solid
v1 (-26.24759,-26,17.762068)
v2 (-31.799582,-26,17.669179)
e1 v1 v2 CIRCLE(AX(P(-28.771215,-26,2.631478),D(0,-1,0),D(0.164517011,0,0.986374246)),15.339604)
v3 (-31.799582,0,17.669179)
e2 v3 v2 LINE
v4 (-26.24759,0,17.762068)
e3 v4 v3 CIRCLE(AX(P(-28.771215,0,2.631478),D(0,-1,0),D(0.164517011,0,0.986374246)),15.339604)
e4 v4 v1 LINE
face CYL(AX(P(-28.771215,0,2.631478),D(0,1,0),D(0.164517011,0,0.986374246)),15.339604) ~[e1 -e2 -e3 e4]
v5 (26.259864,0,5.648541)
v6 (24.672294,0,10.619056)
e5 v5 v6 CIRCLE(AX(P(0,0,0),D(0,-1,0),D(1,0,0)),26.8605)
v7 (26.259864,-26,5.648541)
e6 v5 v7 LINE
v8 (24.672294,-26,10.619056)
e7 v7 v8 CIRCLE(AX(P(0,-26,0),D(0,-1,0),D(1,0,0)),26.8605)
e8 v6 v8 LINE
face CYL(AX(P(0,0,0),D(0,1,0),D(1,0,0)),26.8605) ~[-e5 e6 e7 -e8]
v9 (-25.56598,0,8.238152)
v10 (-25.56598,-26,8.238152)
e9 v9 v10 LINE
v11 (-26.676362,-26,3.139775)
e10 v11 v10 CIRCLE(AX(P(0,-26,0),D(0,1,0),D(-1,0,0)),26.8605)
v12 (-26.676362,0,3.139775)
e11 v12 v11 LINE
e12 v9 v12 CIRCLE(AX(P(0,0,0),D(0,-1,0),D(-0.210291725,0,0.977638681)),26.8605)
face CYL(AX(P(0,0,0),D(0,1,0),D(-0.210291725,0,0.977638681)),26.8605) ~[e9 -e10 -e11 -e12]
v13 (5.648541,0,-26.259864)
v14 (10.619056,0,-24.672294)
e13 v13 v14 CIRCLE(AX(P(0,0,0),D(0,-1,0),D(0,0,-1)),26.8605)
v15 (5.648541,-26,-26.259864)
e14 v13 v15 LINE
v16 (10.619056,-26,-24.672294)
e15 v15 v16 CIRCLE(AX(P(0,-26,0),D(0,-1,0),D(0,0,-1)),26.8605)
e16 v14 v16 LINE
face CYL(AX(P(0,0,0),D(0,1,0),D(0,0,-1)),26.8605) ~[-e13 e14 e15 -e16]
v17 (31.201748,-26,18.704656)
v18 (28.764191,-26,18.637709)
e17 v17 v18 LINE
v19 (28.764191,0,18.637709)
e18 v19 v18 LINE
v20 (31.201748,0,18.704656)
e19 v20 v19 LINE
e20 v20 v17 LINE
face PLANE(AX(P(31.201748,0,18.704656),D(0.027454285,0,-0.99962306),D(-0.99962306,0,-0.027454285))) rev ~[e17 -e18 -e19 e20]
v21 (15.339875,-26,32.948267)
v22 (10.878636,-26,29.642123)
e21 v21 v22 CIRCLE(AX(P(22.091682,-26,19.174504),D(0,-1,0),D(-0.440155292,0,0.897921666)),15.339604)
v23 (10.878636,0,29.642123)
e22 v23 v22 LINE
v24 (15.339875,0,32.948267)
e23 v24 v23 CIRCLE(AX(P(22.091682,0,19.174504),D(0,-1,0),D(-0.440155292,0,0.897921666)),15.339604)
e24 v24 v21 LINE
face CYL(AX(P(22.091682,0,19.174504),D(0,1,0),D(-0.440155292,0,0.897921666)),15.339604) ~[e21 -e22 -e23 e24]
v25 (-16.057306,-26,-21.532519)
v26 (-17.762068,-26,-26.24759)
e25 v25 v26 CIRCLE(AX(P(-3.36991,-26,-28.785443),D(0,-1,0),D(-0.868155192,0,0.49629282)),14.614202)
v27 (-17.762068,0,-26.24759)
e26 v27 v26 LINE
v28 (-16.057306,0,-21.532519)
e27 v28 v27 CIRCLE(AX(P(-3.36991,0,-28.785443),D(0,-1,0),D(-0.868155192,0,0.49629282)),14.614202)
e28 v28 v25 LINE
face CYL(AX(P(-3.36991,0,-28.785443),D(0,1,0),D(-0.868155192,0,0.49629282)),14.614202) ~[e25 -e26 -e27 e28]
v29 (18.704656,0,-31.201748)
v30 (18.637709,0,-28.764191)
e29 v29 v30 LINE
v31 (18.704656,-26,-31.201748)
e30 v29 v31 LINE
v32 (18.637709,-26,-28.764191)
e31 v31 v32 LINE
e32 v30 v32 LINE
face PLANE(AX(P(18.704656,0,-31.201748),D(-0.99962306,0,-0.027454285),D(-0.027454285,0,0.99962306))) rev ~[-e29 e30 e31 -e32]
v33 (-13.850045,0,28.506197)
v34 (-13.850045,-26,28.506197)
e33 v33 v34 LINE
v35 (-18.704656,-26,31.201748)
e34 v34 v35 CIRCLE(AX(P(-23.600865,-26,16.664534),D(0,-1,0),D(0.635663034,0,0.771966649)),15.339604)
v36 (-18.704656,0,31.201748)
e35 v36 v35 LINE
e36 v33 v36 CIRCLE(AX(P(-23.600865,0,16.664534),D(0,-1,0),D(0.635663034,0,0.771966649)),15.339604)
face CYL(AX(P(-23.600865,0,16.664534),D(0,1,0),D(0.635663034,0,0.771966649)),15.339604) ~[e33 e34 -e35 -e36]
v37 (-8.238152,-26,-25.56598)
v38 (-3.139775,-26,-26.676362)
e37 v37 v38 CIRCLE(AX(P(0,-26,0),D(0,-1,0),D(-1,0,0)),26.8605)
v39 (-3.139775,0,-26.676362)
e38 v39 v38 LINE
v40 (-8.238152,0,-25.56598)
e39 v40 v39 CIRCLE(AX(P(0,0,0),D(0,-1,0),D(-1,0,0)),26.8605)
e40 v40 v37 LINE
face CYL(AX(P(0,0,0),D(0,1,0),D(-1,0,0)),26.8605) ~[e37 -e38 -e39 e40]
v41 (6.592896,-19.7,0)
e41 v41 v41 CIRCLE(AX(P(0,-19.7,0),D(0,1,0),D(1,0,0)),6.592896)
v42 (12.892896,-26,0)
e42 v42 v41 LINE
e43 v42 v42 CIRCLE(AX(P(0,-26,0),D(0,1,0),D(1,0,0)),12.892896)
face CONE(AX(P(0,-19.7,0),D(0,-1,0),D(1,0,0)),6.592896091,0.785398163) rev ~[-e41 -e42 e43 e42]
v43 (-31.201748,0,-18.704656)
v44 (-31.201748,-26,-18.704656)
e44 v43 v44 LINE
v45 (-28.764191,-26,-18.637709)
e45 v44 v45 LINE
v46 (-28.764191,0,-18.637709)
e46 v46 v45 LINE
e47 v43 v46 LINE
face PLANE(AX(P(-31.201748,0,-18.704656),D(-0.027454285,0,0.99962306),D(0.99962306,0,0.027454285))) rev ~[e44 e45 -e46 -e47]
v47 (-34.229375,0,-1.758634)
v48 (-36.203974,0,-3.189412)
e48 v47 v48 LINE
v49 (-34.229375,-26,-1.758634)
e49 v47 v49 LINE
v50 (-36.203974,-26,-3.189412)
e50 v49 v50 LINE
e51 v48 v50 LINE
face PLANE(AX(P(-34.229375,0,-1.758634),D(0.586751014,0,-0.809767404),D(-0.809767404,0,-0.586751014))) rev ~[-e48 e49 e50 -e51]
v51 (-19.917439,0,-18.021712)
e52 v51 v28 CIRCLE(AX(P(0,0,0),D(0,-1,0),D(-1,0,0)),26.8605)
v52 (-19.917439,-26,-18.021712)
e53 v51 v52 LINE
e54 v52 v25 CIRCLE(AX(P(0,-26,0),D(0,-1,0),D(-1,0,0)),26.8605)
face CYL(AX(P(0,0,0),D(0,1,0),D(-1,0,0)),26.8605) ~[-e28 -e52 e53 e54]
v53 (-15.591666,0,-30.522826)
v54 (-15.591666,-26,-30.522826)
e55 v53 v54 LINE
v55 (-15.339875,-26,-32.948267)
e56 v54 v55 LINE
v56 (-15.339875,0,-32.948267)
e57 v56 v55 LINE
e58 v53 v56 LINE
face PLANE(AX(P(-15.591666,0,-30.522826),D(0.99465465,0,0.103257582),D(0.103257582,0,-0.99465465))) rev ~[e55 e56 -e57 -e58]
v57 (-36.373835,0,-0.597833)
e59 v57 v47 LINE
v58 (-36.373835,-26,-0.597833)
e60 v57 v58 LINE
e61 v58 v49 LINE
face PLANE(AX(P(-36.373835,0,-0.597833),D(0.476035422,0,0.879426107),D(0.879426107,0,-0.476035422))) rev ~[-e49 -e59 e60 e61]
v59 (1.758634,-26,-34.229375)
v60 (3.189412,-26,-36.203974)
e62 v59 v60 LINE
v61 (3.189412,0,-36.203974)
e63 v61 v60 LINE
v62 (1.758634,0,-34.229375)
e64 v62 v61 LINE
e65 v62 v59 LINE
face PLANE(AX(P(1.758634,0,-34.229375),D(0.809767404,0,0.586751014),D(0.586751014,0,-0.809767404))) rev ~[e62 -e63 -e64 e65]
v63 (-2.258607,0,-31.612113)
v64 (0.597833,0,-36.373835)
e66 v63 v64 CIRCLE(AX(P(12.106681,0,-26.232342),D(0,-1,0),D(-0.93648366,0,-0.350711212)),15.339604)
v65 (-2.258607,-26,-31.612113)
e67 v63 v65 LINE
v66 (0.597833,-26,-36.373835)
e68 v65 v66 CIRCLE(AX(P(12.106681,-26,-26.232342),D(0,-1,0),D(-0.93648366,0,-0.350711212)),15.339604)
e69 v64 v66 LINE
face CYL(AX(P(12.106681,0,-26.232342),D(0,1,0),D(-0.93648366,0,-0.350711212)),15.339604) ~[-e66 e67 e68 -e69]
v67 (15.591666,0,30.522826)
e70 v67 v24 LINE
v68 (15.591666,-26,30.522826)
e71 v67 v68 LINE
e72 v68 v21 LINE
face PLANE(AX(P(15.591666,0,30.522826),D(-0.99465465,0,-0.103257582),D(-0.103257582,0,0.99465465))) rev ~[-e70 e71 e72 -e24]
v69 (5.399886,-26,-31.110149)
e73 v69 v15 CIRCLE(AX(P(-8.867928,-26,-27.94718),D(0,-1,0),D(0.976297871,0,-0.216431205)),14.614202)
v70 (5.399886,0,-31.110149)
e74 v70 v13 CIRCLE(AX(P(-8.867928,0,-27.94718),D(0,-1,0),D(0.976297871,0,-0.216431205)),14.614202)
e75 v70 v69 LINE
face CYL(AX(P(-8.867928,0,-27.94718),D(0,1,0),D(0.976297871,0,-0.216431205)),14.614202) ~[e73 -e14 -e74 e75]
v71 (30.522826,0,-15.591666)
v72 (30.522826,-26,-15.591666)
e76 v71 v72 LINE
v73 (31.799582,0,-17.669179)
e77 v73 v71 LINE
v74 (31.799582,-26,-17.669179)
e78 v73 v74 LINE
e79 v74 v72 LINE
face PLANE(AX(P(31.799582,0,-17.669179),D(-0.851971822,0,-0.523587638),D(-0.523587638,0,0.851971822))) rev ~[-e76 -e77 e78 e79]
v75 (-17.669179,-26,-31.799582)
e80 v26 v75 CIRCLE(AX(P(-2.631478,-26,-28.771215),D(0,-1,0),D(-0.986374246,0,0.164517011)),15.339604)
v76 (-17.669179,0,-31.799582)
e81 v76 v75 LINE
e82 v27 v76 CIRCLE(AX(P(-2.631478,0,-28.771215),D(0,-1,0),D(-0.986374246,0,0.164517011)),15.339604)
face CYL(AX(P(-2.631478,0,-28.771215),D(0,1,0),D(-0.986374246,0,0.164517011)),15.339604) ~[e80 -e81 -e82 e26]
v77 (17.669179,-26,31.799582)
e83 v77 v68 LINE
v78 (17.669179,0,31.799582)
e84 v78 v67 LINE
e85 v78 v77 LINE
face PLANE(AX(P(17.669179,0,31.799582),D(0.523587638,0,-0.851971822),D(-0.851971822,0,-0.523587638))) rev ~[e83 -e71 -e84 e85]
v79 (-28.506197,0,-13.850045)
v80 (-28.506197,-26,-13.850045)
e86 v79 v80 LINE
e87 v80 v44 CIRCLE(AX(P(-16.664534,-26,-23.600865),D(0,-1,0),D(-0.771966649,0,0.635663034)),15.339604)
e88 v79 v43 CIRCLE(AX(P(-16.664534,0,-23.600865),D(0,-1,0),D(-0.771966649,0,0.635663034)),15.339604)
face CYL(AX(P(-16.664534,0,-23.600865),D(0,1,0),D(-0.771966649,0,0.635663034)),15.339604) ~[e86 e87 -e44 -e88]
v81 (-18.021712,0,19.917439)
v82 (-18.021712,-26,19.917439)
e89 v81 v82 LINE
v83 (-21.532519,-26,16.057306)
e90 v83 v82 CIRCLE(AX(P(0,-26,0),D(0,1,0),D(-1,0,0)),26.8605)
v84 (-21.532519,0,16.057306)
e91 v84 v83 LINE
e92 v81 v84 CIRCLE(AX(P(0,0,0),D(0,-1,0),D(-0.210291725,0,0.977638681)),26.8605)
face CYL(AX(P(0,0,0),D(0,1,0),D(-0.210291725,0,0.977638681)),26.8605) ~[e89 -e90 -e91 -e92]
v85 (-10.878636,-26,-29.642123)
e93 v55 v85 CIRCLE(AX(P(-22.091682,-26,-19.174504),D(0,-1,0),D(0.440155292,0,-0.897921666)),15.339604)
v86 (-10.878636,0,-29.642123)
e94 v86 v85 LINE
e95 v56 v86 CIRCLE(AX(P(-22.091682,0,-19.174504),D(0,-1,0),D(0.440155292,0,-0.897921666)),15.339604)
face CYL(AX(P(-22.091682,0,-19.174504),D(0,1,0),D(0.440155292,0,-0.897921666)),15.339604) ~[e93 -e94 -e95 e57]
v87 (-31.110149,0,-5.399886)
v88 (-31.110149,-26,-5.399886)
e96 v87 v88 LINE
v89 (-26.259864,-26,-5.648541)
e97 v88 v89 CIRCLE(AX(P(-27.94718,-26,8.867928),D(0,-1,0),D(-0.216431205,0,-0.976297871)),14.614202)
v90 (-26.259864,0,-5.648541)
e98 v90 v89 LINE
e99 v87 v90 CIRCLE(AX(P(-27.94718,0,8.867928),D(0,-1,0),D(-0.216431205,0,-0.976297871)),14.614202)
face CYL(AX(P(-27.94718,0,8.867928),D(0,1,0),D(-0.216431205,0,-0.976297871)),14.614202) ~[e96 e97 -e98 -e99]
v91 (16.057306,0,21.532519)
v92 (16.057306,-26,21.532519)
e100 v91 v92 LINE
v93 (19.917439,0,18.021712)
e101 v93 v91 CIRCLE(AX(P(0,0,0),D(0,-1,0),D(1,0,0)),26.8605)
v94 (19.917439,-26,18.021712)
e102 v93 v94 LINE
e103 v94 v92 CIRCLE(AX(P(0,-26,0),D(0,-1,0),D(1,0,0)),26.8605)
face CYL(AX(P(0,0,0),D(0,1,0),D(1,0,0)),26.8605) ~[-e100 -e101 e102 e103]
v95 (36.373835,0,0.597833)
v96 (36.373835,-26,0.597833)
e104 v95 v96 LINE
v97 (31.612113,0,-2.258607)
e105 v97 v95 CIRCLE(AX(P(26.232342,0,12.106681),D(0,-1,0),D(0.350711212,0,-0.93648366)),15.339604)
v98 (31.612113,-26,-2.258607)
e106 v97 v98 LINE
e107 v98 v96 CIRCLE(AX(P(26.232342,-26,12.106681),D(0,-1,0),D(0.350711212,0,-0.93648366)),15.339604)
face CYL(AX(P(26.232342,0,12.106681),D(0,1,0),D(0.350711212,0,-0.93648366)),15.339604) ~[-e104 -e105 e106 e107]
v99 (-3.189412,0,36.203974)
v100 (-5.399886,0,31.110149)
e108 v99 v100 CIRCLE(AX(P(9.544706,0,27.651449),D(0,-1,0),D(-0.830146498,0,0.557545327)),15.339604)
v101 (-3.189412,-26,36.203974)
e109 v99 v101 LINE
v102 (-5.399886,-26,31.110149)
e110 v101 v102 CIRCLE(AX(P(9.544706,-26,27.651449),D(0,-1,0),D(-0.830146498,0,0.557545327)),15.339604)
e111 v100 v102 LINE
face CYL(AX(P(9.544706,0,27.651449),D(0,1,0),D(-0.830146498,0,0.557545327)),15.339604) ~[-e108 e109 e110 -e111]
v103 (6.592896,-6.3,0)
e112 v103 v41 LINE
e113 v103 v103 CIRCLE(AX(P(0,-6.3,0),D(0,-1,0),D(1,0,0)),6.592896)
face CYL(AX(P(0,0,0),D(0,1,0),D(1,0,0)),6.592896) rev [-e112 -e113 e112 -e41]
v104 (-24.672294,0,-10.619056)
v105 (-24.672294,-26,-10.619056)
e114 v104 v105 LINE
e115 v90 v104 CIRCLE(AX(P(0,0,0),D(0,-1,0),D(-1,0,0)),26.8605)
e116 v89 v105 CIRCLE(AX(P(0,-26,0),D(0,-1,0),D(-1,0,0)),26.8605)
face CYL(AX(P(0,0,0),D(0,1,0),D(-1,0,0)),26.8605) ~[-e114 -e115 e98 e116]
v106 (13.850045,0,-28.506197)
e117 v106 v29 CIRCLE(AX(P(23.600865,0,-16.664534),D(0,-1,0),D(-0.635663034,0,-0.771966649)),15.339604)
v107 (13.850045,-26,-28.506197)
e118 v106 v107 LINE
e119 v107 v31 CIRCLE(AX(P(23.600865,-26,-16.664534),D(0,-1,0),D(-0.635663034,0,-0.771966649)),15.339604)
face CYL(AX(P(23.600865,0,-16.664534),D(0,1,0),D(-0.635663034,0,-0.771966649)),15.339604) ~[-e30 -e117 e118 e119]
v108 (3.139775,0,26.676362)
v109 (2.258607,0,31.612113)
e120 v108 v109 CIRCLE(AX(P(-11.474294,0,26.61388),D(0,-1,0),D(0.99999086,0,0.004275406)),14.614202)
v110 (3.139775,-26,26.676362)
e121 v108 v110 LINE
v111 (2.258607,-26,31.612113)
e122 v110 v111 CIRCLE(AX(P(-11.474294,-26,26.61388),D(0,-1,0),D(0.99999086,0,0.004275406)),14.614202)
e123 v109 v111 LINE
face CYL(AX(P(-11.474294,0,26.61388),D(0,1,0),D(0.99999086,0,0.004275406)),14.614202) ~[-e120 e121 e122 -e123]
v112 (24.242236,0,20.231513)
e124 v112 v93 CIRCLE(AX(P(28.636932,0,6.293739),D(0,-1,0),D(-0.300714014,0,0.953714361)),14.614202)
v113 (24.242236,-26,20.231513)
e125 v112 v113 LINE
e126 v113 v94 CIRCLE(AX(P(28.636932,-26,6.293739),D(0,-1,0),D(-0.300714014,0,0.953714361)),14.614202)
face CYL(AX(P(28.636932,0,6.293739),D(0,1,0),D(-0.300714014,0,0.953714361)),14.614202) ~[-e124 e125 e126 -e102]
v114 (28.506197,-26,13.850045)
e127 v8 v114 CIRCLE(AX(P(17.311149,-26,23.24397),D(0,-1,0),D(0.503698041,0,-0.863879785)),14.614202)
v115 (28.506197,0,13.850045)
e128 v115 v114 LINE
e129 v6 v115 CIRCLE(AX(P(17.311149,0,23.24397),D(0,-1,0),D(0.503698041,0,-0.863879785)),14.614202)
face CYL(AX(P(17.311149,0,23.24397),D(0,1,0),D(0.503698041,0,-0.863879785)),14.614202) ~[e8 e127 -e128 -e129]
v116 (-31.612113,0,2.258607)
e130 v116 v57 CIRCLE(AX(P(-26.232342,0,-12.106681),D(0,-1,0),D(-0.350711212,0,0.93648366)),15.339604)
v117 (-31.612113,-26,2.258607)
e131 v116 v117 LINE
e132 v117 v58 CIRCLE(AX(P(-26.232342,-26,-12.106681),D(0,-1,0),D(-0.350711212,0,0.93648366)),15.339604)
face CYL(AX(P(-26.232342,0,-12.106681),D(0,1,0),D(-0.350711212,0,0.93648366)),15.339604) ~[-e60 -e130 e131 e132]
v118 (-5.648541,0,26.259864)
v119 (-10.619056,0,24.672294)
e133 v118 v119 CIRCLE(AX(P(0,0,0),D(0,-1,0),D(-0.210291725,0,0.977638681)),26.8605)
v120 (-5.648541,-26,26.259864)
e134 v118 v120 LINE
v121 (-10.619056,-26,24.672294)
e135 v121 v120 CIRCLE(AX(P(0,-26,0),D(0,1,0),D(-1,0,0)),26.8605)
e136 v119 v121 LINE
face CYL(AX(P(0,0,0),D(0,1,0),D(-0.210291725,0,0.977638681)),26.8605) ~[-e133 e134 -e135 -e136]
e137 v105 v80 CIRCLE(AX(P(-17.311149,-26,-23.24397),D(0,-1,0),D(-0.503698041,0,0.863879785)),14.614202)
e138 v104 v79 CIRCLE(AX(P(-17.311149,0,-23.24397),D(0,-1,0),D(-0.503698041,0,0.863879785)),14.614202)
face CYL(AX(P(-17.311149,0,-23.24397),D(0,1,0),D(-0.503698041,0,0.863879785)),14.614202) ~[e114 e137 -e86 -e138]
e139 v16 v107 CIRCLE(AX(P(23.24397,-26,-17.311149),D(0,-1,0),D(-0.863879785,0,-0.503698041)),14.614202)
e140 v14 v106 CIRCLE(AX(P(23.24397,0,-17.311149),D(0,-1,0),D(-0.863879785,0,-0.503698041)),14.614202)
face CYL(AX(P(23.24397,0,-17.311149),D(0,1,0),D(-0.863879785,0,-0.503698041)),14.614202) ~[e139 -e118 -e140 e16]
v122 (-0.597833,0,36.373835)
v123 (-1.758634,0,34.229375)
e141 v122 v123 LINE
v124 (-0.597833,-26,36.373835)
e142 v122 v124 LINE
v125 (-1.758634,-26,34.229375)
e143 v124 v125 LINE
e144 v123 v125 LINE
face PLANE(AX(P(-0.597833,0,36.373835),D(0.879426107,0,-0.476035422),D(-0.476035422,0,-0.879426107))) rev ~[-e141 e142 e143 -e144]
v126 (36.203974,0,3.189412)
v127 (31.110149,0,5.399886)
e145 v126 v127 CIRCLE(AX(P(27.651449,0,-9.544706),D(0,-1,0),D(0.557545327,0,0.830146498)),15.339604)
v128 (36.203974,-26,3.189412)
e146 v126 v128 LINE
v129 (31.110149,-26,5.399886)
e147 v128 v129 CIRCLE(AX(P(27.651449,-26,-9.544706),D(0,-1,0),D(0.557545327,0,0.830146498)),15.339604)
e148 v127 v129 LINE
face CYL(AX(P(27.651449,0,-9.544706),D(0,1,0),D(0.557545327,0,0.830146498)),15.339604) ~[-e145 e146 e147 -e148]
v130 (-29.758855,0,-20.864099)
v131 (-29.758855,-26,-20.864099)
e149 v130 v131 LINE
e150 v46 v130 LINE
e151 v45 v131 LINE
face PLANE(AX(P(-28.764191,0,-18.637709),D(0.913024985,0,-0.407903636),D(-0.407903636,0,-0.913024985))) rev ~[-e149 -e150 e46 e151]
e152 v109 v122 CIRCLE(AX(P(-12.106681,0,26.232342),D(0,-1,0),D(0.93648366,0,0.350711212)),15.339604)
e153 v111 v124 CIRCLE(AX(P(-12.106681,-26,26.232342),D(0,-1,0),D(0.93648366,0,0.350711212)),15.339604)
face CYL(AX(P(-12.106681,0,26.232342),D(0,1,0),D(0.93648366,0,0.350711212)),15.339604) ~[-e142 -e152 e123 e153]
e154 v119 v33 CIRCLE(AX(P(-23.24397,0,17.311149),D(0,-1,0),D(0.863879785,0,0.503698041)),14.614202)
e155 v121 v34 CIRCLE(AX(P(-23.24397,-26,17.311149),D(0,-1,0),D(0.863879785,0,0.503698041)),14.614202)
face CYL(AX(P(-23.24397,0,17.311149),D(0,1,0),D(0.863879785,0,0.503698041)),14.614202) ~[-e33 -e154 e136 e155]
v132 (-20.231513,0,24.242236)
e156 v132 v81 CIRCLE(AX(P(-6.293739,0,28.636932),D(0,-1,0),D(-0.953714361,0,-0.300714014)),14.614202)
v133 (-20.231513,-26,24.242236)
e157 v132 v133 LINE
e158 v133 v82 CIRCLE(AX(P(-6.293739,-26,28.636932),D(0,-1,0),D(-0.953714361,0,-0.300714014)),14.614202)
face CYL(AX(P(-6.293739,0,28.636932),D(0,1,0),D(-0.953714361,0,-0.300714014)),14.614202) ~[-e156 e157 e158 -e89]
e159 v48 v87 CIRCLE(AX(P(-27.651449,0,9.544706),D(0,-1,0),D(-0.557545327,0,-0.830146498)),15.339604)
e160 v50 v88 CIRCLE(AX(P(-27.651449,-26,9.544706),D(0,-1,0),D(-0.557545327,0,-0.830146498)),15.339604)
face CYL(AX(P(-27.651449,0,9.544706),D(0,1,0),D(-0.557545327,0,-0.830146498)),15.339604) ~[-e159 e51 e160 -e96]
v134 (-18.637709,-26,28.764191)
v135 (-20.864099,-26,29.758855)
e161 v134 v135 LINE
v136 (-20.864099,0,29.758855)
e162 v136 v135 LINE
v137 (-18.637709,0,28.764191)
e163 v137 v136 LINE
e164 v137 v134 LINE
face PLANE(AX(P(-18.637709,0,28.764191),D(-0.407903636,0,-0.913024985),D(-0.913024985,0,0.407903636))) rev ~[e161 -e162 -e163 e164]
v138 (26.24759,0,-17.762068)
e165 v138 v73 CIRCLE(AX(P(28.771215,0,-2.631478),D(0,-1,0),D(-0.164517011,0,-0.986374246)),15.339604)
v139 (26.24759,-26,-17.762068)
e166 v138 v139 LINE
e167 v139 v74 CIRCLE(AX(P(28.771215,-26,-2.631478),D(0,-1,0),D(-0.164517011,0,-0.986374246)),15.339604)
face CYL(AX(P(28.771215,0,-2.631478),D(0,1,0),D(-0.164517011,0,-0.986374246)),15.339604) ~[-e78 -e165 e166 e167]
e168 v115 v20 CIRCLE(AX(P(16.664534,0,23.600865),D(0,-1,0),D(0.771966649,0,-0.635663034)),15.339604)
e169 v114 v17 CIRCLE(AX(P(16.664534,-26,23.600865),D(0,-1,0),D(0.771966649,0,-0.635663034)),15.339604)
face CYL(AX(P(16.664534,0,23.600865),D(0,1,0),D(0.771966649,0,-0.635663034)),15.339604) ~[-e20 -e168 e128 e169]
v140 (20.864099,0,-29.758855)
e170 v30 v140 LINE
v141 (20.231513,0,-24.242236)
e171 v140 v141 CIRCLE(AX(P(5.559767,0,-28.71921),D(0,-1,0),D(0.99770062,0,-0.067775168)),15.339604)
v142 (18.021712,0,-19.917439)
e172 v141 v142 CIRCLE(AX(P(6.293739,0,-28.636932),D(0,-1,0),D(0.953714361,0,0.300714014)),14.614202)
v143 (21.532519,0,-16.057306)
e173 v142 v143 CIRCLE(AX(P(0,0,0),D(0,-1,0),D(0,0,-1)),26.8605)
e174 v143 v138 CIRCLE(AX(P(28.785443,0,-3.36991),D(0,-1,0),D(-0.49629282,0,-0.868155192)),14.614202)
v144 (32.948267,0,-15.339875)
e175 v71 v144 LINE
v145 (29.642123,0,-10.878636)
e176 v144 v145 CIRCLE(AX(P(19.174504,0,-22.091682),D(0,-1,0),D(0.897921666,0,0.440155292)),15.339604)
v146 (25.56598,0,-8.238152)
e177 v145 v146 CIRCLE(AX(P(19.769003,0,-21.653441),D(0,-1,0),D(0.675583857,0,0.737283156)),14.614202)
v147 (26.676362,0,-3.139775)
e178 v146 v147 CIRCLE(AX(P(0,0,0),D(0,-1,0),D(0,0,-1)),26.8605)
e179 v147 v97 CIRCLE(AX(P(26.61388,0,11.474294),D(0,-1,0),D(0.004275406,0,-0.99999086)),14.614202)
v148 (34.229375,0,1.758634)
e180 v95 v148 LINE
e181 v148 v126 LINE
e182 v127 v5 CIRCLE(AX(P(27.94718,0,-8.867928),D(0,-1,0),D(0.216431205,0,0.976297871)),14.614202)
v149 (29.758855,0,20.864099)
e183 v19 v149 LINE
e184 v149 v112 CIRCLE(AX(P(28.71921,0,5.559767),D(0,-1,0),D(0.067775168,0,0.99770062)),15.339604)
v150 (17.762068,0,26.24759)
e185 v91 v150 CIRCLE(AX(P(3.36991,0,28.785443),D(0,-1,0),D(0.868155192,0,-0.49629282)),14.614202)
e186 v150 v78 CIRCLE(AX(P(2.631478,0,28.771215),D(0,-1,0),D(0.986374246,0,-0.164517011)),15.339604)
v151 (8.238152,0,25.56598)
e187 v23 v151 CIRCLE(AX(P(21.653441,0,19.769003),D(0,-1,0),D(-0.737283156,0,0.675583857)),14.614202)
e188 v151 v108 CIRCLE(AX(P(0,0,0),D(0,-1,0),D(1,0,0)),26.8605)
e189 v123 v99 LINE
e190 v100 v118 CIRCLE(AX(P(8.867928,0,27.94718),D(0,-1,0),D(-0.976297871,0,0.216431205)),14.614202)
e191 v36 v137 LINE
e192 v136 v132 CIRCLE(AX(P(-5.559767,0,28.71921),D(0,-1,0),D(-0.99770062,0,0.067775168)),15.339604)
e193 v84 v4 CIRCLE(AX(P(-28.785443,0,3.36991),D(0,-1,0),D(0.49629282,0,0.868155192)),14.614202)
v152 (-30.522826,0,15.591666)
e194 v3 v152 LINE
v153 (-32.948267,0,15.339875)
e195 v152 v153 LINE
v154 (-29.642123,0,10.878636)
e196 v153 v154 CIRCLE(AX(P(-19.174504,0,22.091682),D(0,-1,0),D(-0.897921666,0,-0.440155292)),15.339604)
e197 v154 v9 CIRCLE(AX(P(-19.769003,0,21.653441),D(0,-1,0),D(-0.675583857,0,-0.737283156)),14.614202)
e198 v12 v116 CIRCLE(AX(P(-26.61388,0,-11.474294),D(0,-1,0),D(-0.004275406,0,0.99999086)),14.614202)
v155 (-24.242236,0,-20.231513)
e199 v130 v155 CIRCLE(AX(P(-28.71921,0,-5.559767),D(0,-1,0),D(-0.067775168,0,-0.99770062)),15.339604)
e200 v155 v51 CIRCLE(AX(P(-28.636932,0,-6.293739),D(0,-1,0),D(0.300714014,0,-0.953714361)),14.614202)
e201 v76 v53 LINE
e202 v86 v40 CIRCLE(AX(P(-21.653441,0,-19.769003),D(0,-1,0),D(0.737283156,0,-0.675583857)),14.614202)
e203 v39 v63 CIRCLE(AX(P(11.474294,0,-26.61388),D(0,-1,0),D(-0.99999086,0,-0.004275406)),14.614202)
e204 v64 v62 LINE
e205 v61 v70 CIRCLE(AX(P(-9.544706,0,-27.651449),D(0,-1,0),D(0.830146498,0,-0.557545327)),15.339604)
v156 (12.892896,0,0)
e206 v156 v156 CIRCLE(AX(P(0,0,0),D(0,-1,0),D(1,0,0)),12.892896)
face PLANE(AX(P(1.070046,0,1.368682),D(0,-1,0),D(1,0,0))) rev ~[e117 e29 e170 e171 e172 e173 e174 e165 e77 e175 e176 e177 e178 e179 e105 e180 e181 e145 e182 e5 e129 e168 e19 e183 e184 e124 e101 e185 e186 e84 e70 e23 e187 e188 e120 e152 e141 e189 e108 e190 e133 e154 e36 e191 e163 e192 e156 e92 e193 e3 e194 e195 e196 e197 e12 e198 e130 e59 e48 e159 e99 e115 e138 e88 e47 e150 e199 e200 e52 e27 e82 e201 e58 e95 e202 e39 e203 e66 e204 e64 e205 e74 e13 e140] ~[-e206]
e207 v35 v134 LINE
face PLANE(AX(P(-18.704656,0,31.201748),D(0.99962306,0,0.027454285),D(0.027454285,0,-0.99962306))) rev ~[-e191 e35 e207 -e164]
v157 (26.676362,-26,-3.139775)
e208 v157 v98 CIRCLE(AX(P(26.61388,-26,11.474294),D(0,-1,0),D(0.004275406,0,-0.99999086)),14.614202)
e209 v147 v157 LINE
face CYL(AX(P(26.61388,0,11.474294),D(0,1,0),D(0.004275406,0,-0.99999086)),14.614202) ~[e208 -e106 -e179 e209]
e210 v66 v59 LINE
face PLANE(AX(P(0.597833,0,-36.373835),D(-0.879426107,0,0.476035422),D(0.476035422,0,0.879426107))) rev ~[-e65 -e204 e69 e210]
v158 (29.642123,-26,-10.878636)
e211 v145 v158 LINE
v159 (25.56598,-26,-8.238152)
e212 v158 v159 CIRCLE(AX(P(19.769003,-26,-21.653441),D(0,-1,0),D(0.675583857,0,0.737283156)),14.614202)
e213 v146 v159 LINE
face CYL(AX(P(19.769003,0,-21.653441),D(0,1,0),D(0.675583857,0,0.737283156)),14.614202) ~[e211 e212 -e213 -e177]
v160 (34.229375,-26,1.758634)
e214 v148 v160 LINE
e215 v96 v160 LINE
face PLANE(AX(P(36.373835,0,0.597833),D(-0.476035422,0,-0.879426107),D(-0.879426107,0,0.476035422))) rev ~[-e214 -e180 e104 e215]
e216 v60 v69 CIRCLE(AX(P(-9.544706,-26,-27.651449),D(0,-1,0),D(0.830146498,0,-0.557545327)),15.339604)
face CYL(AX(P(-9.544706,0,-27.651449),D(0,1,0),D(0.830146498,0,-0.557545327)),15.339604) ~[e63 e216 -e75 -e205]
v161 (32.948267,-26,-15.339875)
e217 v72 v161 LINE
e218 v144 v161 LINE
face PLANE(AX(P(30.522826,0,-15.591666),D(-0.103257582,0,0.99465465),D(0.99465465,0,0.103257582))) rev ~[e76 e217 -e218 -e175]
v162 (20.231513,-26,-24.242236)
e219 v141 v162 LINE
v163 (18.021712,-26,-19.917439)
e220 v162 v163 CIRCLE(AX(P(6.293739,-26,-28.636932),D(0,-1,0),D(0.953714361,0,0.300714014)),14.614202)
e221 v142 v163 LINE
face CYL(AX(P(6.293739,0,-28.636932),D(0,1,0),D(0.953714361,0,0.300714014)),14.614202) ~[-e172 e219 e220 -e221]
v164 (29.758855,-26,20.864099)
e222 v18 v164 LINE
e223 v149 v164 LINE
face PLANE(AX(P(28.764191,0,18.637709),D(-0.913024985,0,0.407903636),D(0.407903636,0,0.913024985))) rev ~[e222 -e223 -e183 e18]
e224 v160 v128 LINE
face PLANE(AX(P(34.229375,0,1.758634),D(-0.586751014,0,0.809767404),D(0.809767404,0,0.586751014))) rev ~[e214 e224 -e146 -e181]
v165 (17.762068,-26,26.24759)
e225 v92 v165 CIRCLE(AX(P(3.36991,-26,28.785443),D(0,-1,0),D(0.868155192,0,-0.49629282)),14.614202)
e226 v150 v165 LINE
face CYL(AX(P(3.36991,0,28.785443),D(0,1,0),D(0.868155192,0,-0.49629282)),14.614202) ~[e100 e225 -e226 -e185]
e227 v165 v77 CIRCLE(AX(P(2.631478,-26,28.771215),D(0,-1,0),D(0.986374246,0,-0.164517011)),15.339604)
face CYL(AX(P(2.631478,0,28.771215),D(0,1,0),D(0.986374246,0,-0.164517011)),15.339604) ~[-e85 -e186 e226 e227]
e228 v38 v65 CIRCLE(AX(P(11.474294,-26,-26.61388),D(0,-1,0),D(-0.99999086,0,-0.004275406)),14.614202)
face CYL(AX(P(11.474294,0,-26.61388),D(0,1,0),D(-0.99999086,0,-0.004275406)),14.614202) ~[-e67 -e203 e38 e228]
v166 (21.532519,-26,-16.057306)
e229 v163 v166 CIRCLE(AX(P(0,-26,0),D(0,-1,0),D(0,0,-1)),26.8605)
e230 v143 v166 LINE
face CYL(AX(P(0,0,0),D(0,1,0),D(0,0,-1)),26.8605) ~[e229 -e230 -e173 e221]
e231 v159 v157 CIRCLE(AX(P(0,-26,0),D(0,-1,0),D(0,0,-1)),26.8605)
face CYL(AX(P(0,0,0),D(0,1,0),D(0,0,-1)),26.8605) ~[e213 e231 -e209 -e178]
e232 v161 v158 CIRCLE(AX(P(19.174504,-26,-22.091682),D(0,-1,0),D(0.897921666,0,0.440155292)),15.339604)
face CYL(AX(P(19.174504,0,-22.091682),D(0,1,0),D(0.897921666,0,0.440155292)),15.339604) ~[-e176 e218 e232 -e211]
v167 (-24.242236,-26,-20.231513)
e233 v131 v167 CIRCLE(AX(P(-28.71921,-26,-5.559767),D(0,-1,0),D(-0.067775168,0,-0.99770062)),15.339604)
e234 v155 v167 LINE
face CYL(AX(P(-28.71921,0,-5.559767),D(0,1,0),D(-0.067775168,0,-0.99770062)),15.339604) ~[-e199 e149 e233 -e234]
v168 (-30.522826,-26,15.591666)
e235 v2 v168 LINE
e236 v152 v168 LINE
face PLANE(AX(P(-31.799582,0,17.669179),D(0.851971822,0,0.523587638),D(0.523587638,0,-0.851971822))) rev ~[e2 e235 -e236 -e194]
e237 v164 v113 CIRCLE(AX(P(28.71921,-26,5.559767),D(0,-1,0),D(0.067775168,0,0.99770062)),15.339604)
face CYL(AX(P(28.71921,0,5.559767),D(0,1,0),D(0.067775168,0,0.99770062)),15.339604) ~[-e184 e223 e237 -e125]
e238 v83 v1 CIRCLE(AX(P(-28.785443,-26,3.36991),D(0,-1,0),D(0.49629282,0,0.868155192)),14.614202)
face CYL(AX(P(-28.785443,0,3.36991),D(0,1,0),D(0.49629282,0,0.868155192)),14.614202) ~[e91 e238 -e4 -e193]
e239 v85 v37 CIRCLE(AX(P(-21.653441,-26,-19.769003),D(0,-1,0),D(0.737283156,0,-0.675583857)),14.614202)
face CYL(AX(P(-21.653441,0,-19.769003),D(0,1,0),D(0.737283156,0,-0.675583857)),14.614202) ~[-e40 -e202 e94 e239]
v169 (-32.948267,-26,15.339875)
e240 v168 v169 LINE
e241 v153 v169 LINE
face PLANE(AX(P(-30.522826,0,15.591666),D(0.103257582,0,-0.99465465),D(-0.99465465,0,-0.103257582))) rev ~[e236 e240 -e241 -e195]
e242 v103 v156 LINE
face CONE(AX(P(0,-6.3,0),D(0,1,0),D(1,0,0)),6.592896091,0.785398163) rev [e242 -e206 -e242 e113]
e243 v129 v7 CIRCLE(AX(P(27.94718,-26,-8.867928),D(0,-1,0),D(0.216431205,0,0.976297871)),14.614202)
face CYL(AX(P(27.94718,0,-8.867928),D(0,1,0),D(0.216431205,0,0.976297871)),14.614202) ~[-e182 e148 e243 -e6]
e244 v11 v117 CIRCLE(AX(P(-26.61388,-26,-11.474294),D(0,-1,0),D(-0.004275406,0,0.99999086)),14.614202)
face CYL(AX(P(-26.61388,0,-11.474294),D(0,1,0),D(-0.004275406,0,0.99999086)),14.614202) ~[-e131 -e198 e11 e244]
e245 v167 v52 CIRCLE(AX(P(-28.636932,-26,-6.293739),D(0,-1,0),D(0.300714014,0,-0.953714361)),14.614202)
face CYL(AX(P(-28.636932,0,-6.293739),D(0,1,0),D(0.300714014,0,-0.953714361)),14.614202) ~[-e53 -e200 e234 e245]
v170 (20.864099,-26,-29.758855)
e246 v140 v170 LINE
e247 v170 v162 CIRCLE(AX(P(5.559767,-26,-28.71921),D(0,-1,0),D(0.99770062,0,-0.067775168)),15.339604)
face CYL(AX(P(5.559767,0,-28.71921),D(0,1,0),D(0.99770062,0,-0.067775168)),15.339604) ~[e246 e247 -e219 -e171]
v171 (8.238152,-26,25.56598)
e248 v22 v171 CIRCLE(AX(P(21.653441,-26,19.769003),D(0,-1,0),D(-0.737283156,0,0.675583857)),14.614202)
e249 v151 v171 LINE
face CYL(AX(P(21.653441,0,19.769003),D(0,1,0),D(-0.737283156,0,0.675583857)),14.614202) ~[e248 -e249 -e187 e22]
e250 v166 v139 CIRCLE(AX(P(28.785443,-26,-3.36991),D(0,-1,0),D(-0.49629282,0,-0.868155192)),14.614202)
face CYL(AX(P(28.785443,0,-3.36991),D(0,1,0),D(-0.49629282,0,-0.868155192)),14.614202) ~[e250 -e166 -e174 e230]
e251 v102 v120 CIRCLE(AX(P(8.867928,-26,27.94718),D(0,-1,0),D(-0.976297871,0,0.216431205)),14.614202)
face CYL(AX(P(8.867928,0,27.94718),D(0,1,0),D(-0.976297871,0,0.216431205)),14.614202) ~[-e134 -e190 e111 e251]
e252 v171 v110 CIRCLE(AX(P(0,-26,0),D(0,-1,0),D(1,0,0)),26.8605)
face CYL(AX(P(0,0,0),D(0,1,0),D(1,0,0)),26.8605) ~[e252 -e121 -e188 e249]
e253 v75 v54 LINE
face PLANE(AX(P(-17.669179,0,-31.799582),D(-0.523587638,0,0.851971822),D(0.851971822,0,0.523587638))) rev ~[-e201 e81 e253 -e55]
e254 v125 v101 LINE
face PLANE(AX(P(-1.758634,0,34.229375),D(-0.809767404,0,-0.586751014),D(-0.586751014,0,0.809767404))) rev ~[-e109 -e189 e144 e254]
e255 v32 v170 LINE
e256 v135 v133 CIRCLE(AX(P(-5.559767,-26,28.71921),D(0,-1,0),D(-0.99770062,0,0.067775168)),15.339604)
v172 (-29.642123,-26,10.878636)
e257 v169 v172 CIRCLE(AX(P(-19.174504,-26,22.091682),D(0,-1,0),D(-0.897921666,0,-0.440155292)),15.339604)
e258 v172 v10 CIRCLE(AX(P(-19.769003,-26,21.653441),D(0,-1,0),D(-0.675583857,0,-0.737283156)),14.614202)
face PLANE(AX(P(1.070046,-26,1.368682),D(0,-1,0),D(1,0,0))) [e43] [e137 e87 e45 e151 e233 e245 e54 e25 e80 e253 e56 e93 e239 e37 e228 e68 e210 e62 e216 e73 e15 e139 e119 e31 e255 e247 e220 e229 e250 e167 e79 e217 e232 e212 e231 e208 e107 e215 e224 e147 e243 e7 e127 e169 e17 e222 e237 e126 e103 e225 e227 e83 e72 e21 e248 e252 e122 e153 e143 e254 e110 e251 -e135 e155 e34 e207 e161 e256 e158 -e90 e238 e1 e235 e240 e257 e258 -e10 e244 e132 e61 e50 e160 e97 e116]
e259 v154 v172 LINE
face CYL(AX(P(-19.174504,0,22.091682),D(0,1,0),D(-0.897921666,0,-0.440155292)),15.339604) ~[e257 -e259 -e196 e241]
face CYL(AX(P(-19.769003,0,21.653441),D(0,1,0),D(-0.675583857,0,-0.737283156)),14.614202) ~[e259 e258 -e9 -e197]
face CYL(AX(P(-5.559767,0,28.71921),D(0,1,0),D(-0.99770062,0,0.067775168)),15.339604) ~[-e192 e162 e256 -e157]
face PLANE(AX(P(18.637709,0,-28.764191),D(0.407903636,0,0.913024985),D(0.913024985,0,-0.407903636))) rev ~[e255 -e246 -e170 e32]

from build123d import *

# Parameters (mm, degrees)
F0_R     = 6.5928960908
F1_DEPTH = 26
F2_COUNT = 12
F3_SIZE  = 6.3


# Not quite as in the source:
# - a feature names something its author has since deleted; it is built from what else it names


with BuildPart() as f1:
    # F0 (on Front) → F1 (new body)
    with BuildSketch(Plane.XZ):
        with BuildLine():
            ThreePointArc((-5.6485408912, 26.2598637858), (-16.878445243, -20.8950842647), (26.8605, 0))
            ThreePointArc((26.8605, 0), (20.0726478905, 17.8486768953), (3.1397750014, 26.6763616933))
            ThreePointArc((3.1397750014, 26.6763616933), (-1.2715518862, 26.8303860585), (-5.6485408912, 26.2598637858))
        make_face()
        Circle(F0_R, mode=Mode.SUBTRACT)
        with BuildLine():
            ThreePointArc((-5.6485408912, 26.2598637858), (-1.2715518862, 26.8303860585), (3.1397750014, 26.6763616933))
            ThreePointArc((3.1397750014, 26.6763616933), (2.912439248, 29.1823081791), (2.258607373, 31.6121133592))
            ThreePointArc((2.258607373, 31.6121133592), (1.0476425624, 34.1233003108), (-0.5978331908, 36.3738347416))
            Line((-0.5978331908, 36.3738347416), (-1.7586341705, 34.2293752337))
            Line((-1.7586341705, 34.2293752337), (-3.1894124709, 36.2039736615))
            ThreePointArc((-3.1894124709, 36.2039736615), (-4.5270572612, 33.7579151802), (-5.3998864293, 31.1101491555))
            ThreePointArc((-5.3998864293, 31.1101491555), (-5.727107406, 28.6954080102), (-5.6485408912, 26.2598637858))
        make_face()
    extrude(amount=F1_DEPTH)

    # F2: F1 ×12 about axis
    f2_axis = Axis((0, 0, 0), (0, 1, 0))


with BuildPart() as f1_1:
    add(f1.part)
    for i in range(1, F2_COUNT):
        add(f1.part.rotate(f2_axis, i * 360 / F2_COUNT))

    # F3
    f3_edges = [f1_1.edges().sort_by_distance(p)[0] for p in [
        (-6.592896, 0, 0),
        (6.592896, -13, 0),
        (-6.592896, -26, 0),
    ]]
    chamfer(f3_edges, length=F3_SIZE)


solid = f1_1.part
